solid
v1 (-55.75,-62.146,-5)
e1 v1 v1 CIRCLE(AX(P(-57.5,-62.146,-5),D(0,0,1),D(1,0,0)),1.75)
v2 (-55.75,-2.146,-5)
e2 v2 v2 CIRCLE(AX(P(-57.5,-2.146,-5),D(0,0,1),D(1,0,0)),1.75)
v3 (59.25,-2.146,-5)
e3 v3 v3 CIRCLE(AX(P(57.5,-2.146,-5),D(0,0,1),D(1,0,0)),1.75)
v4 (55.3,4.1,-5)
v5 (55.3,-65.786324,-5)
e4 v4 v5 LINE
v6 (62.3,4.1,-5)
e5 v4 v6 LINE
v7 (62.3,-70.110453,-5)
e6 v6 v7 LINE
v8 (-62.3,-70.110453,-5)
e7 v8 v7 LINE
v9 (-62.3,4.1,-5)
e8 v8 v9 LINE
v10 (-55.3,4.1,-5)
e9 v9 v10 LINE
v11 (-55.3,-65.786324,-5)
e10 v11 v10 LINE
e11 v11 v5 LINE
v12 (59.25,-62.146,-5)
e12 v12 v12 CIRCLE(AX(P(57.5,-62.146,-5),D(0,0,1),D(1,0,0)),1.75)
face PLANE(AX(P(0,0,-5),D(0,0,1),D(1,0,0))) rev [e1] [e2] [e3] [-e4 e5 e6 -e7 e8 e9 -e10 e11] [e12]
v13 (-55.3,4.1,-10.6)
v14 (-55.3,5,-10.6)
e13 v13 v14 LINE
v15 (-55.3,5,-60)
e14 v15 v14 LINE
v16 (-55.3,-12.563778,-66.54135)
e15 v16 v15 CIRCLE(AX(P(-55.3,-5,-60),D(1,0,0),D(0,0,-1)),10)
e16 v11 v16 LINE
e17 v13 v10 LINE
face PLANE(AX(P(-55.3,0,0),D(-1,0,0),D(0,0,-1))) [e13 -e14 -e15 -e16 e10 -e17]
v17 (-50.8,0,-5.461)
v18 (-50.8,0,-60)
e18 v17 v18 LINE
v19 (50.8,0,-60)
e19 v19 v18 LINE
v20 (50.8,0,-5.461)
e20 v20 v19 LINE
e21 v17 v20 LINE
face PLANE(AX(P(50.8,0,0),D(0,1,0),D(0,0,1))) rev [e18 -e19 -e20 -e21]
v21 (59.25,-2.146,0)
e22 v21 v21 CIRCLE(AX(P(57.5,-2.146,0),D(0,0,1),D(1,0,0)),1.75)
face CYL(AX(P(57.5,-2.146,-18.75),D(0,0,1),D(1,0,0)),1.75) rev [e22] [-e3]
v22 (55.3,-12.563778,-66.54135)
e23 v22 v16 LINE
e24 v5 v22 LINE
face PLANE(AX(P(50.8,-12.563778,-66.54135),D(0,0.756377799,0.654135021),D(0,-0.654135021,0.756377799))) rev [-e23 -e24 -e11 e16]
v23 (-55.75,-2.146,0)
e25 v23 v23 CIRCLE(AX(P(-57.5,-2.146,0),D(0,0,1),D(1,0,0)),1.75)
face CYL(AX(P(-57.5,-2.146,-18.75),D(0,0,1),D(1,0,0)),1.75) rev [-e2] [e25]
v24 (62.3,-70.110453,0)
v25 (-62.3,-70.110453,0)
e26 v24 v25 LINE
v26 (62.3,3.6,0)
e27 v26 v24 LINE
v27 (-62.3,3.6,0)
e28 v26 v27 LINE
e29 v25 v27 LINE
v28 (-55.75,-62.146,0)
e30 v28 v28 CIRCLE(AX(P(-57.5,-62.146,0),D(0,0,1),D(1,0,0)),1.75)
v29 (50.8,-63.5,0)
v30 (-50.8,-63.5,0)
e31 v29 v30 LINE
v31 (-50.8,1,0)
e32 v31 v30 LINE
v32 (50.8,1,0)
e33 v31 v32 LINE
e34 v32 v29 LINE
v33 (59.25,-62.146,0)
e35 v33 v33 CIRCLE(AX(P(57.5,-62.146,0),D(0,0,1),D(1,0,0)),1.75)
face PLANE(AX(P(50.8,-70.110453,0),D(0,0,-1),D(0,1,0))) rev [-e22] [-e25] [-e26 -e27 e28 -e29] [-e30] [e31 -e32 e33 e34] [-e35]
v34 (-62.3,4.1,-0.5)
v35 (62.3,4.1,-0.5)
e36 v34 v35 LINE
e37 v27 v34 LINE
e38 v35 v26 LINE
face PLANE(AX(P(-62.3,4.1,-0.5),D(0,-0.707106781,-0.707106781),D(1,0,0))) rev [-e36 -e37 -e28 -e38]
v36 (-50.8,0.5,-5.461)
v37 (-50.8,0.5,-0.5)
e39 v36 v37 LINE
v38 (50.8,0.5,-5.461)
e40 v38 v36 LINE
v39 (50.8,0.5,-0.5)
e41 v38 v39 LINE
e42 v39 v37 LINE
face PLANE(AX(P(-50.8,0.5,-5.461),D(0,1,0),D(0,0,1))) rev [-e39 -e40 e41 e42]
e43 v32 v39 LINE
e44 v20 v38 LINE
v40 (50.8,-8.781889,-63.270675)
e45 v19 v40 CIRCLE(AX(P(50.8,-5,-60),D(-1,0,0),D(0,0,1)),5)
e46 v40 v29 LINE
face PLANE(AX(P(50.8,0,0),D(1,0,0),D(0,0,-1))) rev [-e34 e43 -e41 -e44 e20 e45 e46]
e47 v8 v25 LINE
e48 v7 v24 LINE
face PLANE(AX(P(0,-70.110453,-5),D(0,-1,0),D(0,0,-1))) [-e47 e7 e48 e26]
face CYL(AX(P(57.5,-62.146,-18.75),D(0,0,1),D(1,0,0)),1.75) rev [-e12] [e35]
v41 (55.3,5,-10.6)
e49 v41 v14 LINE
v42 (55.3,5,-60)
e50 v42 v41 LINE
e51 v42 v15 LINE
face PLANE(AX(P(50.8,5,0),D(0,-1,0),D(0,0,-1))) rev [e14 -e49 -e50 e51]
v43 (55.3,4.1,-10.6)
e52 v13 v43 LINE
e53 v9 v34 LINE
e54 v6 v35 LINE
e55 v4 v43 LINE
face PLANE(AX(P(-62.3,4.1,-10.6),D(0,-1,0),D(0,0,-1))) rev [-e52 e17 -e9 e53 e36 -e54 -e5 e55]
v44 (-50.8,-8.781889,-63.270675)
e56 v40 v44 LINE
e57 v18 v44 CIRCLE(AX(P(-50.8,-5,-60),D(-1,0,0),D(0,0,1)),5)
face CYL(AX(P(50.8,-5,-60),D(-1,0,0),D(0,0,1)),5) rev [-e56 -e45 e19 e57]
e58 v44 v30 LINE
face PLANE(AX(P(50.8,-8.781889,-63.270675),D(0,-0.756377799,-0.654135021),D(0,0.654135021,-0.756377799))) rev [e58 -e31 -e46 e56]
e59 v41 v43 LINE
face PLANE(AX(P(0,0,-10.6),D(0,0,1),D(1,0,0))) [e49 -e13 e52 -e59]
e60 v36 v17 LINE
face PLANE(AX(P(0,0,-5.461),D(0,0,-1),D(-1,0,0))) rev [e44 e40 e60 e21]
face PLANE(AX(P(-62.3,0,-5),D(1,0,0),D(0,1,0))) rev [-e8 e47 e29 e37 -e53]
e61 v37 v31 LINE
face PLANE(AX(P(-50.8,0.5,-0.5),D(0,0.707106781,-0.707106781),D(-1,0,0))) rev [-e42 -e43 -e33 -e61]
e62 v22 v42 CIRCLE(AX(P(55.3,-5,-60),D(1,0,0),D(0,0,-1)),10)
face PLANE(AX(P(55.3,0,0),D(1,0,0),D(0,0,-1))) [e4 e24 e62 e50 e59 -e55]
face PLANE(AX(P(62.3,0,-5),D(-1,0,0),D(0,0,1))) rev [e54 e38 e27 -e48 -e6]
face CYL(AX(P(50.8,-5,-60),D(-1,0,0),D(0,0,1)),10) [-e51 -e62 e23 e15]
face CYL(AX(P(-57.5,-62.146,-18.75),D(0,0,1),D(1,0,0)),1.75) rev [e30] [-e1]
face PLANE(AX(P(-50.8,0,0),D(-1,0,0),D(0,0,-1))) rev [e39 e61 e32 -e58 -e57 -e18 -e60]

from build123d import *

# Parameters (mm, degrees)
BOSS_EXTRUDE1_DEPTH = 50.8
BOSS_EXTRUDE3_START = 4.5
BOSS_EXTRUDE3_DEPTH = 4.5
BOSS_EXTRUDE4_DEPTH = 5
SKETCH6_R           = 1.75
CUT_EXTRUDE1_DEPTH  = 18.75
SKETCH7_W           = 101.6
SKETCH7_H           = 0.5
CUT_EXTRUDE2_DEPTH  = 5.461
SKETCH8_W           = 124.6
SKETCH8_H           = 0.9
CUT_EXTRUDE3_DEPTH  = 10.6
FILLET1_SIZE        = 0.5


with BuildPart() as part:
    # Sketch1 → Boss-Extrude1 (new, symmetric)
    with BuildSketch(Plane(origin=(0, 0, 0), x_dir=(0, 0, -1), z_dir=(1, 0, 0))):
        with BuildLine():
            Line((0, 0), (60, 0))
            ThreePointArc((60, 0), (64.685586675, -3.254927648), (63.270675103, -8.781888995))
            Line((63.270675103, -8.781888995), (0, -63.5))
            Line((0, -63.5), (0, -70.110453145))
            Line((0, -70.110453145), (66.541350207, -12.56377799))
            ThreePointArc((66.541350207, -12.56377799), (69.37117335, -1.509855296), (60, 5))
            Line((60, 5), (0, 5))
            Line((0, 5), (0, 0))
        make_face()
    extrude(amount=BOSS_EXTRUDE1_DEPTH, both=True)

    # Sketch3 → Boss-Extrude3 (add)
    with BuildSketch(Plane(origin=(50.8, 0, 0), x_dir=(0, 0, -1), z_dir=(1, 0, 0)).offset(BOSS_EXTRUDE3_START)):
        with BuildLine():
            Line((0, -70.110453145), (66.541350207, -12.56377799))
            ThreePointArc((66.541350207, -12.56377799), (69.37117335, -1.509855296), (60, 5))
            Line((60, 5), (0, 5))
            Line((0, 5), (0, -70.110453145))
        make_face()
    boss_extrude3 = extrude(amount=-BOSS_EXTRUDE3_DEPTH)

    # Mirror1: Boss-Extrude3 across plane
    add(boss_extrude3.mirror(Plane(origin=(0, 0, 0), x_dir=(0, 0, 1), z_dir=(1, 0, 0))))

    # Sketch4 → Boss-Extrude4 (add)
    with BuildSketch(Plane.XY):
        Polygon((-50.8, 5), (-62.3, 5), (-62.3, -70.110453145), (62.3, -70.110453145), (62.3, 5), (50.8, 5), (50.8, -63.5), (-50.8, -63.5), align=None)
    extrude(amount=-BOSS_EXTRUDE4_DEPTH)

    # Sketch6 → Cut-Extrude1 (cut)
    with BuildSketch(Plane.XY):
        with Locations((-57.5, -2.146)):
            Circle(SKETCH6_R)
        with Locations((-57.5, -62.146)):
            Circle(SKETCH6_R)
        with Locations((57.5, -62.146)):
            Circle(SKETCH6_R)
        with Locations((57.5, -2.146)):
            Circle(SKETCH6_R)
    extrude(amount=-CUT_EXTRUDE1_DEPTH, mode=Mode.SUBTRACT)

    # Sketch7 → Cut-Extrude2 (cut)
    with BuildSketch(Plane.XY):
        with Locations((0, 0.25)):
            Rectangle(SKETCH7_W, SKETCH7_H)
    extrude(amount=-CUT_EXTRUDE2_DEPTH, mode=Mode.SUBTRACT)

    # Sketch8 → Cut-Extrude3 (cut)
    with BuildSketch(Plane.XY):
        with Locations((0, 4.55)):
            Rectangle(SKETCH8_W, SKETCH8_H)
    extrude(amount=-CUT_EXTRUDE3_DEPTH, mode=Mode.SUBTRACT)

    # Fillet1
    fillet1_edges = [part.edges().sort_by_distance(p)[0] for p in [
        (0, 0.5, 0),
        (0, 4.1, 0),
    ]]
    chamfer(fillet1_edges, length=FILLET1_SIZE)


solid = part.part
